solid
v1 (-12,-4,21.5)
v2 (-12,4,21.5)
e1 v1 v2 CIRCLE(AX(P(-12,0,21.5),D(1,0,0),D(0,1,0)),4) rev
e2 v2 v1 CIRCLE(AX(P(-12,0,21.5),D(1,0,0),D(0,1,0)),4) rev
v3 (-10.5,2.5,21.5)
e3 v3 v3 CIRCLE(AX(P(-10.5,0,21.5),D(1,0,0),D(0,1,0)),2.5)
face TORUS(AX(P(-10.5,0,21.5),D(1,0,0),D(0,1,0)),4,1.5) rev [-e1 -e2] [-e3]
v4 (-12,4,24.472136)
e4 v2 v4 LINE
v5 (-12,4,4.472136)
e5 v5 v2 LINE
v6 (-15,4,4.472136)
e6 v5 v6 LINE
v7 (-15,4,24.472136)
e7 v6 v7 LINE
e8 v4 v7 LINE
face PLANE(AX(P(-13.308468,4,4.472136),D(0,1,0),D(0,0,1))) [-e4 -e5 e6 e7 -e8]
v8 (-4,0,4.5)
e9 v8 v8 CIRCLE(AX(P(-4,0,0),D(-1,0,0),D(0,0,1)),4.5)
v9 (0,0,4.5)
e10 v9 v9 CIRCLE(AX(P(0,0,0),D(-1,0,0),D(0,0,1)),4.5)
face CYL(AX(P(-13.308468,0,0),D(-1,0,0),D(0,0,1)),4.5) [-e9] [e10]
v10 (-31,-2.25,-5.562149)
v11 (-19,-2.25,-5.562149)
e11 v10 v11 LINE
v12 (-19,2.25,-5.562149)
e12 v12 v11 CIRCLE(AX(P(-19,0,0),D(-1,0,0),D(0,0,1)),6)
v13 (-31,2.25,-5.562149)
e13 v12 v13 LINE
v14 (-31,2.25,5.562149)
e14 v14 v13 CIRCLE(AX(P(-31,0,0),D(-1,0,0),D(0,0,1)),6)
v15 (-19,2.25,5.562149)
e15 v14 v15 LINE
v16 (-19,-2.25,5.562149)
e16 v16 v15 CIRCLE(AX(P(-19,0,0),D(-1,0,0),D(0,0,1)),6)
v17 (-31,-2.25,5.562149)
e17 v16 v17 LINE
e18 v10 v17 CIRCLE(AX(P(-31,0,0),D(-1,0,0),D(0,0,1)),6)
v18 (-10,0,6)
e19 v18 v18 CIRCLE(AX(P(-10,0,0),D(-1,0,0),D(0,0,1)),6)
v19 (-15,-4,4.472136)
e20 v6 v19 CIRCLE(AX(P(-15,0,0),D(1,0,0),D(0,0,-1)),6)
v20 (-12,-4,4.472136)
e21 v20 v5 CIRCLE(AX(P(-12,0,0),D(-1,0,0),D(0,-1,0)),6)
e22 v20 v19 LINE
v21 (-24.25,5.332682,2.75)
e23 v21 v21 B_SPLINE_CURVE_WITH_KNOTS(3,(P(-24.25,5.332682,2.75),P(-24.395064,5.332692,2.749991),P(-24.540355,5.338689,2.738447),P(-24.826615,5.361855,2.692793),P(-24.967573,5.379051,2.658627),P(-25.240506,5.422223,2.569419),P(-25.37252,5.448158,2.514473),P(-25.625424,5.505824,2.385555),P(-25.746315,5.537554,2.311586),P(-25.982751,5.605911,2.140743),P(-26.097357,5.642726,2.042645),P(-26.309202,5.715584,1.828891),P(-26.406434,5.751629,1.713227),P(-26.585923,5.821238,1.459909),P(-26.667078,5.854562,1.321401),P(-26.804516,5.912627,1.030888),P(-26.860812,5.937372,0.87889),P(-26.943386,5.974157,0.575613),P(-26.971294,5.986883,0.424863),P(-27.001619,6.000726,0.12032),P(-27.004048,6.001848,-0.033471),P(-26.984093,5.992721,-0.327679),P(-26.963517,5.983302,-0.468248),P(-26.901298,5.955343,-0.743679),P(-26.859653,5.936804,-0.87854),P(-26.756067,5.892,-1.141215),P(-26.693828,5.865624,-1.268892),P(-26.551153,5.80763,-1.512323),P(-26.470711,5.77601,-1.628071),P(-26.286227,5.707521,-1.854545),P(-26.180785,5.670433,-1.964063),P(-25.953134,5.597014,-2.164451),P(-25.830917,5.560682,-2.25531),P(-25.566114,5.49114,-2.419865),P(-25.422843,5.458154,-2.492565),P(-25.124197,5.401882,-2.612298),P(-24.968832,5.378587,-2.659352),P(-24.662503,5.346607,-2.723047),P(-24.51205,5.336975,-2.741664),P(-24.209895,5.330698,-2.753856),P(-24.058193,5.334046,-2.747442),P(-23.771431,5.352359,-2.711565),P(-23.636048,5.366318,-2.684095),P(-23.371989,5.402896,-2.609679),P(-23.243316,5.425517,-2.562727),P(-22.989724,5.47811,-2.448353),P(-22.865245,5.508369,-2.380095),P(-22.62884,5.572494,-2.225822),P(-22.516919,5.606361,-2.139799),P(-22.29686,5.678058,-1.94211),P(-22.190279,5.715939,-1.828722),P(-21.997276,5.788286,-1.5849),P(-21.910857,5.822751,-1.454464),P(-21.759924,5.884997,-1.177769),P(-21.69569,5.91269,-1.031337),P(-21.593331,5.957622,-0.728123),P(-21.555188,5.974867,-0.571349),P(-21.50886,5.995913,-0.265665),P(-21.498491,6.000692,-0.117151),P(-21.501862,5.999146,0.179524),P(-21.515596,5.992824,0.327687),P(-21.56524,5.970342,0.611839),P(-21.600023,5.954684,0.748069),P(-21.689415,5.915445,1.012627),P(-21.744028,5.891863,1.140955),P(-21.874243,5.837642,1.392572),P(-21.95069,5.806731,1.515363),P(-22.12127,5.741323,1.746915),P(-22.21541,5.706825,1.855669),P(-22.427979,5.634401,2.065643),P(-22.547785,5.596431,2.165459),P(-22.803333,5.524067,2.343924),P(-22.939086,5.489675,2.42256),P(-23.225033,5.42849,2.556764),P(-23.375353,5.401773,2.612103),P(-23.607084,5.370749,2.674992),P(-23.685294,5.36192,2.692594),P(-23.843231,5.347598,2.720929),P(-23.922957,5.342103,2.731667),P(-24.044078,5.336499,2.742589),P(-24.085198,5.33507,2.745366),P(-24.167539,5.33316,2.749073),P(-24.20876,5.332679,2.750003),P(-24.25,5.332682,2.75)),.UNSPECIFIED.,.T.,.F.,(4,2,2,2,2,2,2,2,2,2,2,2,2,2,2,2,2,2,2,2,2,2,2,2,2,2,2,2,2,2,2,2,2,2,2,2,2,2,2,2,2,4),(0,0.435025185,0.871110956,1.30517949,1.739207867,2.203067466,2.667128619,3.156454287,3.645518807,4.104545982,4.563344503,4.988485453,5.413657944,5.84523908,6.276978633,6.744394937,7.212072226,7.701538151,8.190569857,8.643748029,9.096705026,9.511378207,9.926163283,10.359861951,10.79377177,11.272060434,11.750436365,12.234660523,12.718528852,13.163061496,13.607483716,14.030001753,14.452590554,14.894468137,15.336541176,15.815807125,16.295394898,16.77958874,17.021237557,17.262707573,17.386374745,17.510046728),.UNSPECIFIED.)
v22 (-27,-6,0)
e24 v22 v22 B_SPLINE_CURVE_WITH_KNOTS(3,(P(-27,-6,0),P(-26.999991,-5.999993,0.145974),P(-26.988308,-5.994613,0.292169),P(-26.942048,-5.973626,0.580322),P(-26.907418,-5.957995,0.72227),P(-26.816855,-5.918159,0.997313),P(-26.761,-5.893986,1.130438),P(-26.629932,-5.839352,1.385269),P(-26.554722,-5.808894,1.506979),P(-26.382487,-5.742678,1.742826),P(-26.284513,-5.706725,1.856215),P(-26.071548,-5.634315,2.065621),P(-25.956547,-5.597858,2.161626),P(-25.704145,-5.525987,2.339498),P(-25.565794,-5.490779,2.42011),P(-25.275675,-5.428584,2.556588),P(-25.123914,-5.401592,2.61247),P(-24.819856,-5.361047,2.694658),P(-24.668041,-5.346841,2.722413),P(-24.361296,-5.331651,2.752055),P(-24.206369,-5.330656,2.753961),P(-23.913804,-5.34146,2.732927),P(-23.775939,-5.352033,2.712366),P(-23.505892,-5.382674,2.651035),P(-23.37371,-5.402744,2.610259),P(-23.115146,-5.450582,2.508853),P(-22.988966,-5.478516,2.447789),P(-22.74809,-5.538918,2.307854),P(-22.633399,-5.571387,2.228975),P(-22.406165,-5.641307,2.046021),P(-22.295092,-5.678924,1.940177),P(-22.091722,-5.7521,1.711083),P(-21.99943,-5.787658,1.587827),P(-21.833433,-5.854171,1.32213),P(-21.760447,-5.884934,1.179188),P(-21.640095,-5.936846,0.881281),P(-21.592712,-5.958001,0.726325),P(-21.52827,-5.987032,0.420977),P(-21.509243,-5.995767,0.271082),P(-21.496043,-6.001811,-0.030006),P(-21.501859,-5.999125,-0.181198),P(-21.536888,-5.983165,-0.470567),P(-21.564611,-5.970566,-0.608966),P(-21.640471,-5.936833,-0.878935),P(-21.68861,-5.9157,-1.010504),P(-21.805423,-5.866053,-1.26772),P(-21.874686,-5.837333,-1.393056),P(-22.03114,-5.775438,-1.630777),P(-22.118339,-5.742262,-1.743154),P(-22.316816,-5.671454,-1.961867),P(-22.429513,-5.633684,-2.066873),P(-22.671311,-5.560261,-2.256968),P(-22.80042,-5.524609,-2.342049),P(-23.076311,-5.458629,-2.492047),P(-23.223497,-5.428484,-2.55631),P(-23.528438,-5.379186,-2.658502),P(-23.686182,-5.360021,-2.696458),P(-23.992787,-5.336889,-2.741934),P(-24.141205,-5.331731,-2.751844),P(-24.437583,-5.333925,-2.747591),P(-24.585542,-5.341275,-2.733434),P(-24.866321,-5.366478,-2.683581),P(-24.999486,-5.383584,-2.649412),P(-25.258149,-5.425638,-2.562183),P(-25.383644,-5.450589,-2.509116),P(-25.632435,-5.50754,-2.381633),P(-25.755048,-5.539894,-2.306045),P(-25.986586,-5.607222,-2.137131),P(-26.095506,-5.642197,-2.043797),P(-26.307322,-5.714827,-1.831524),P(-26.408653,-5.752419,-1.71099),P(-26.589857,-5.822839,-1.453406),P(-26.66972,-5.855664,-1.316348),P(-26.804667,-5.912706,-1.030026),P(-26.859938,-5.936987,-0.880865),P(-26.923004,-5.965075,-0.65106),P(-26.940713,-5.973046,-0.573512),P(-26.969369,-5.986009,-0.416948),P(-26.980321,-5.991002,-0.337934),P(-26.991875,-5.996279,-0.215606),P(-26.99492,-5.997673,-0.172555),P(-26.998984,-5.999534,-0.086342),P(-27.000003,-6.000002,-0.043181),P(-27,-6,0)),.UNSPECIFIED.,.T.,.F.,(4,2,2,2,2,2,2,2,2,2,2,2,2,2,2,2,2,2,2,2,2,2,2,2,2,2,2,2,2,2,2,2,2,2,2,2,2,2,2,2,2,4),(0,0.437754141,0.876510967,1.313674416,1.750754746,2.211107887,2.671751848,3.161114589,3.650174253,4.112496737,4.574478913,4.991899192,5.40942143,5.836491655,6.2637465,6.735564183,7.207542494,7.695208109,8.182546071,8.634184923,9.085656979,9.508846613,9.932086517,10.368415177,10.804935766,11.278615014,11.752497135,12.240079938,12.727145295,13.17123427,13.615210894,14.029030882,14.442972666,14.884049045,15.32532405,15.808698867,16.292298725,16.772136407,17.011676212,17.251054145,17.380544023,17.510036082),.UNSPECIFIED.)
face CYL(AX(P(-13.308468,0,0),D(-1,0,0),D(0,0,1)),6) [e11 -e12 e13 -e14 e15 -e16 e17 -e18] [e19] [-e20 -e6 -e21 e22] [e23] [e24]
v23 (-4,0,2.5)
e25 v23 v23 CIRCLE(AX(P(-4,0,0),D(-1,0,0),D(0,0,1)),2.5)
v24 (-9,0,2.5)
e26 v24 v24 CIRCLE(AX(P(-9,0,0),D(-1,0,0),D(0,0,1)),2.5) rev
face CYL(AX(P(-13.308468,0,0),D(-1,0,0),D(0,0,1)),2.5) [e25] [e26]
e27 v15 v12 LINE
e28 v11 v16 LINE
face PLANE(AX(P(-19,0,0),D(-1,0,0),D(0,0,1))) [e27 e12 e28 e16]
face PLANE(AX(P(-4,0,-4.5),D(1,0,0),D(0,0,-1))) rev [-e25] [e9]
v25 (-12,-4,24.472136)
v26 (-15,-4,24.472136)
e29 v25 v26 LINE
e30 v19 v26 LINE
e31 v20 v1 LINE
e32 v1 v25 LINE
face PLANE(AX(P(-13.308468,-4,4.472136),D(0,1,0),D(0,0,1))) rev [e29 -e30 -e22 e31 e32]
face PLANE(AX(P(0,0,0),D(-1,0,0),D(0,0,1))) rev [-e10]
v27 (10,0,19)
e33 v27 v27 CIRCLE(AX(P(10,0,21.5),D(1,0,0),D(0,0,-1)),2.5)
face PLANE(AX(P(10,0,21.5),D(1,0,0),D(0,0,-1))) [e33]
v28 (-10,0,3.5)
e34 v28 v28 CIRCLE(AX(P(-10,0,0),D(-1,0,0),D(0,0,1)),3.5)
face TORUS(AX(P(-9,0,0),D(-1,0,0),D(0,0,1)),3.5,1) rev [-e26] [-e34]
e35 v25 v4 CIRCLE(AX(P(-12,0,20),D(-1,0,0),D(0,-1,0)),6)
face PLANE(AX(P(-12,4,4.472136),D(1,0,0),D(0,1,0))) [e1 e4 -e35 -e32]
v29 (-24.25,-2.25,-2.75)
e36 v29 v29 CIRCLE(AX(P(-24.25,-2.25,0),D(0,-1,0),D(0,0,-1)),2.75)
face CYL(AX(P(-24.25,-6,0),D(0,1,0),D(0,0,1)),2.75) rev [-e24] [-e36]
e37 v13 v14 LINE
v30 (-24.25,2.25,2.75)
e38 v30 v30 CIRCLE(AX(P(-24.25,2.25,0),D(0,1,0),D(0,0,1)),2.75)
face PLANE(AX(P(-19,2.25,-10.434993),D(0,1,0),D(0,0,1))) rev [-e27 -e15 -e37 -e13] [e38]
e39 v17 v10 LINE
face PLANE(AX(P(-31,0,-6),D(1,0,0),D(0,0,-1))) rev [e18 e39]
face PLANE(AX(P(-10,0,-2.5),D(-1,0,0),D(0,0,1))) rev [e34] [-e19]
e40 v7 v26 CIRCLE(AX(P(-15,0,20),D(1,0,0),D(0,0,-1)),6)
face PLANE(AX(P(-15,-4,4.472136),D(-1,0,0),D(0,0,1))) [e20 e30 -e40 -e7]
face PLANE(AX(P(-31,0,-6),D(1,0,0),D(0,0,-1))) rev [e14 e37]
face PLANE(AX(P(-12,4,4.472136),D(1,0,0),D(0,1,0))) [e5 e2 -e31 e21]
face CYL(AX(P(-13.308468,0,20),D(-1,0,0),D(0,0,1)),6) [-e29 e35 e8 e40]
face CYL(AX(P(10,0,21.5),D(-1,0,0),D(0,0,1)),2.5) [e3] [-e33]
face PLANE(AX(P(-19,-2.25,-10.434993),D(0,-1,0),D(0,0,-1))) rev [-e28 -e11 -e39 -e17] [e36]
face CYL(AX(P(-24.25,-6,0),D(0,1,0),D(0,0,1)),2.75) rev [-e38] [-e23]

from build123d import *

# Parameters (mm, degrees)
SKETCH2_W               = 20.869986484
SKETCH2_H               = 4.5
CUT_EXTRUDE1_DEPTH      = 12
CUT_EXTRUDE2_DEPTH      = 33.14031736
CUT_EXTRUDE2_DEPTH_BACK = 33.14031736
SKETCH3_R               = 2.75
BOSS_EXTRUDE1_START     = -15
BOSS_EXTRUDE1_DEPTH     = 3
SKETCH6_R               = 2.5
BOSS_EXTRUDE2_DEPTH     = 22
FILLET1_R               = 1
FILLET2_R               = 1.5


# Read off the part's stored shape, not the designer's step: Boss-Extrude1
with BuildPart() as part:
    # Sketch1 → Revolve1 (revolve)
    with BuildSketch(Plane(origin=(0, 0, 0), x_dir=(1, 0, 0), z_dir=(0, 1, 0)), mode=Mode.PRIVATE) as revolve1_sk:
        Polygon((0, 0), (0, 4.5), (-4, 4.5), (-4, 2.5), (-10, 2.5), (-10, 6), (-31, 6), (-31, 0), align=None)
    revolve(revolve1_sk.sketch.rotate(Axis((-13.308467742, 0, 0), (1, 0, 0)), 180), axis=Axis((-13.308467742, 0, 0), (1, 0, 0)))

    # Sketch2 → Cut-Extrude1 (cut)
    with BuildSketch(Plane.ZY.offset(31)):
        Rectangle(SKETCH2_W, SKETCH2_H)
    extrude(amount=-CUT_EXTRUDE1_DEPTH, mode=Mode.SUBTRACT)

    # Sketch3 → Cut-Extrude2 (cut, two sides: drawn at the far end of the back side and taken through both)
    with BuildSketch(Plane(origin=(0, 0, 0), x_dir=(1, 0, 0), z_dir=(0, 1, 0)).offset(-CUT_EXTRUDE2_DEPTH_BACK)):
        with Locations(Location((-24.25, 0, 0), (0, 0, 270))):
            Circle(SKETCH3_R)
    extrude(amount=CUT_EXTRUDE2_DEPTH + CUT_EXTRUDE2_DEPTH_BACK, mode=Mode.SUBTRACT)

    # Boss-Extrude1 outline → Boss-Extrude1 (add)
    with BuildSketch(Plane.YZ.offset(BOSS_EXTRUDE1_START)):
        with BuildLine():
            ThreePointArc((4, 24.472135955), (0, 26), (-4, 24.472135955))
            Line((-4, 24.472135955), (-4, 4.472135955))
            ThreePointArc((-4, 4.472135955), (0, 6), (4, 4.472135955))
            Line((4, 4.472135955), (4, 24.472135955))
        make_face()
    extrude(amount=BOSS_EXTRUDE1_DEPTH)

    # Sketch6 → Boss-Extrude2 (add)
    with BuildSketch(Plane(origin=(-12, 0, 0), x_dir=(0, 0, -1), z_dir=(1, 0, 0))):
        with Locations((-21.5, 0)):
            Circle(SKETCH6_R)
    extrude(amount=BOSS_EXTRUDE2_DEPTH)

    # Fillet1
    fillet1_edges = [part.edges().sort_by_distance(p)[0] for p in [
        (-10, 0, -2.5),
    ]]
    fillet(fillet1_edges, radius=FILLET1_R)

    # Fillet2
    fillet2_edges = [part.edges().sort_by_distance(p)[0] for p in [
        (-12, 0, 24),
    ]]
    fillet(fillet2_edges, radius=FILLET2_R - 0.0001)  # a hair under: the kernel refuses the full size


solid = part.part
